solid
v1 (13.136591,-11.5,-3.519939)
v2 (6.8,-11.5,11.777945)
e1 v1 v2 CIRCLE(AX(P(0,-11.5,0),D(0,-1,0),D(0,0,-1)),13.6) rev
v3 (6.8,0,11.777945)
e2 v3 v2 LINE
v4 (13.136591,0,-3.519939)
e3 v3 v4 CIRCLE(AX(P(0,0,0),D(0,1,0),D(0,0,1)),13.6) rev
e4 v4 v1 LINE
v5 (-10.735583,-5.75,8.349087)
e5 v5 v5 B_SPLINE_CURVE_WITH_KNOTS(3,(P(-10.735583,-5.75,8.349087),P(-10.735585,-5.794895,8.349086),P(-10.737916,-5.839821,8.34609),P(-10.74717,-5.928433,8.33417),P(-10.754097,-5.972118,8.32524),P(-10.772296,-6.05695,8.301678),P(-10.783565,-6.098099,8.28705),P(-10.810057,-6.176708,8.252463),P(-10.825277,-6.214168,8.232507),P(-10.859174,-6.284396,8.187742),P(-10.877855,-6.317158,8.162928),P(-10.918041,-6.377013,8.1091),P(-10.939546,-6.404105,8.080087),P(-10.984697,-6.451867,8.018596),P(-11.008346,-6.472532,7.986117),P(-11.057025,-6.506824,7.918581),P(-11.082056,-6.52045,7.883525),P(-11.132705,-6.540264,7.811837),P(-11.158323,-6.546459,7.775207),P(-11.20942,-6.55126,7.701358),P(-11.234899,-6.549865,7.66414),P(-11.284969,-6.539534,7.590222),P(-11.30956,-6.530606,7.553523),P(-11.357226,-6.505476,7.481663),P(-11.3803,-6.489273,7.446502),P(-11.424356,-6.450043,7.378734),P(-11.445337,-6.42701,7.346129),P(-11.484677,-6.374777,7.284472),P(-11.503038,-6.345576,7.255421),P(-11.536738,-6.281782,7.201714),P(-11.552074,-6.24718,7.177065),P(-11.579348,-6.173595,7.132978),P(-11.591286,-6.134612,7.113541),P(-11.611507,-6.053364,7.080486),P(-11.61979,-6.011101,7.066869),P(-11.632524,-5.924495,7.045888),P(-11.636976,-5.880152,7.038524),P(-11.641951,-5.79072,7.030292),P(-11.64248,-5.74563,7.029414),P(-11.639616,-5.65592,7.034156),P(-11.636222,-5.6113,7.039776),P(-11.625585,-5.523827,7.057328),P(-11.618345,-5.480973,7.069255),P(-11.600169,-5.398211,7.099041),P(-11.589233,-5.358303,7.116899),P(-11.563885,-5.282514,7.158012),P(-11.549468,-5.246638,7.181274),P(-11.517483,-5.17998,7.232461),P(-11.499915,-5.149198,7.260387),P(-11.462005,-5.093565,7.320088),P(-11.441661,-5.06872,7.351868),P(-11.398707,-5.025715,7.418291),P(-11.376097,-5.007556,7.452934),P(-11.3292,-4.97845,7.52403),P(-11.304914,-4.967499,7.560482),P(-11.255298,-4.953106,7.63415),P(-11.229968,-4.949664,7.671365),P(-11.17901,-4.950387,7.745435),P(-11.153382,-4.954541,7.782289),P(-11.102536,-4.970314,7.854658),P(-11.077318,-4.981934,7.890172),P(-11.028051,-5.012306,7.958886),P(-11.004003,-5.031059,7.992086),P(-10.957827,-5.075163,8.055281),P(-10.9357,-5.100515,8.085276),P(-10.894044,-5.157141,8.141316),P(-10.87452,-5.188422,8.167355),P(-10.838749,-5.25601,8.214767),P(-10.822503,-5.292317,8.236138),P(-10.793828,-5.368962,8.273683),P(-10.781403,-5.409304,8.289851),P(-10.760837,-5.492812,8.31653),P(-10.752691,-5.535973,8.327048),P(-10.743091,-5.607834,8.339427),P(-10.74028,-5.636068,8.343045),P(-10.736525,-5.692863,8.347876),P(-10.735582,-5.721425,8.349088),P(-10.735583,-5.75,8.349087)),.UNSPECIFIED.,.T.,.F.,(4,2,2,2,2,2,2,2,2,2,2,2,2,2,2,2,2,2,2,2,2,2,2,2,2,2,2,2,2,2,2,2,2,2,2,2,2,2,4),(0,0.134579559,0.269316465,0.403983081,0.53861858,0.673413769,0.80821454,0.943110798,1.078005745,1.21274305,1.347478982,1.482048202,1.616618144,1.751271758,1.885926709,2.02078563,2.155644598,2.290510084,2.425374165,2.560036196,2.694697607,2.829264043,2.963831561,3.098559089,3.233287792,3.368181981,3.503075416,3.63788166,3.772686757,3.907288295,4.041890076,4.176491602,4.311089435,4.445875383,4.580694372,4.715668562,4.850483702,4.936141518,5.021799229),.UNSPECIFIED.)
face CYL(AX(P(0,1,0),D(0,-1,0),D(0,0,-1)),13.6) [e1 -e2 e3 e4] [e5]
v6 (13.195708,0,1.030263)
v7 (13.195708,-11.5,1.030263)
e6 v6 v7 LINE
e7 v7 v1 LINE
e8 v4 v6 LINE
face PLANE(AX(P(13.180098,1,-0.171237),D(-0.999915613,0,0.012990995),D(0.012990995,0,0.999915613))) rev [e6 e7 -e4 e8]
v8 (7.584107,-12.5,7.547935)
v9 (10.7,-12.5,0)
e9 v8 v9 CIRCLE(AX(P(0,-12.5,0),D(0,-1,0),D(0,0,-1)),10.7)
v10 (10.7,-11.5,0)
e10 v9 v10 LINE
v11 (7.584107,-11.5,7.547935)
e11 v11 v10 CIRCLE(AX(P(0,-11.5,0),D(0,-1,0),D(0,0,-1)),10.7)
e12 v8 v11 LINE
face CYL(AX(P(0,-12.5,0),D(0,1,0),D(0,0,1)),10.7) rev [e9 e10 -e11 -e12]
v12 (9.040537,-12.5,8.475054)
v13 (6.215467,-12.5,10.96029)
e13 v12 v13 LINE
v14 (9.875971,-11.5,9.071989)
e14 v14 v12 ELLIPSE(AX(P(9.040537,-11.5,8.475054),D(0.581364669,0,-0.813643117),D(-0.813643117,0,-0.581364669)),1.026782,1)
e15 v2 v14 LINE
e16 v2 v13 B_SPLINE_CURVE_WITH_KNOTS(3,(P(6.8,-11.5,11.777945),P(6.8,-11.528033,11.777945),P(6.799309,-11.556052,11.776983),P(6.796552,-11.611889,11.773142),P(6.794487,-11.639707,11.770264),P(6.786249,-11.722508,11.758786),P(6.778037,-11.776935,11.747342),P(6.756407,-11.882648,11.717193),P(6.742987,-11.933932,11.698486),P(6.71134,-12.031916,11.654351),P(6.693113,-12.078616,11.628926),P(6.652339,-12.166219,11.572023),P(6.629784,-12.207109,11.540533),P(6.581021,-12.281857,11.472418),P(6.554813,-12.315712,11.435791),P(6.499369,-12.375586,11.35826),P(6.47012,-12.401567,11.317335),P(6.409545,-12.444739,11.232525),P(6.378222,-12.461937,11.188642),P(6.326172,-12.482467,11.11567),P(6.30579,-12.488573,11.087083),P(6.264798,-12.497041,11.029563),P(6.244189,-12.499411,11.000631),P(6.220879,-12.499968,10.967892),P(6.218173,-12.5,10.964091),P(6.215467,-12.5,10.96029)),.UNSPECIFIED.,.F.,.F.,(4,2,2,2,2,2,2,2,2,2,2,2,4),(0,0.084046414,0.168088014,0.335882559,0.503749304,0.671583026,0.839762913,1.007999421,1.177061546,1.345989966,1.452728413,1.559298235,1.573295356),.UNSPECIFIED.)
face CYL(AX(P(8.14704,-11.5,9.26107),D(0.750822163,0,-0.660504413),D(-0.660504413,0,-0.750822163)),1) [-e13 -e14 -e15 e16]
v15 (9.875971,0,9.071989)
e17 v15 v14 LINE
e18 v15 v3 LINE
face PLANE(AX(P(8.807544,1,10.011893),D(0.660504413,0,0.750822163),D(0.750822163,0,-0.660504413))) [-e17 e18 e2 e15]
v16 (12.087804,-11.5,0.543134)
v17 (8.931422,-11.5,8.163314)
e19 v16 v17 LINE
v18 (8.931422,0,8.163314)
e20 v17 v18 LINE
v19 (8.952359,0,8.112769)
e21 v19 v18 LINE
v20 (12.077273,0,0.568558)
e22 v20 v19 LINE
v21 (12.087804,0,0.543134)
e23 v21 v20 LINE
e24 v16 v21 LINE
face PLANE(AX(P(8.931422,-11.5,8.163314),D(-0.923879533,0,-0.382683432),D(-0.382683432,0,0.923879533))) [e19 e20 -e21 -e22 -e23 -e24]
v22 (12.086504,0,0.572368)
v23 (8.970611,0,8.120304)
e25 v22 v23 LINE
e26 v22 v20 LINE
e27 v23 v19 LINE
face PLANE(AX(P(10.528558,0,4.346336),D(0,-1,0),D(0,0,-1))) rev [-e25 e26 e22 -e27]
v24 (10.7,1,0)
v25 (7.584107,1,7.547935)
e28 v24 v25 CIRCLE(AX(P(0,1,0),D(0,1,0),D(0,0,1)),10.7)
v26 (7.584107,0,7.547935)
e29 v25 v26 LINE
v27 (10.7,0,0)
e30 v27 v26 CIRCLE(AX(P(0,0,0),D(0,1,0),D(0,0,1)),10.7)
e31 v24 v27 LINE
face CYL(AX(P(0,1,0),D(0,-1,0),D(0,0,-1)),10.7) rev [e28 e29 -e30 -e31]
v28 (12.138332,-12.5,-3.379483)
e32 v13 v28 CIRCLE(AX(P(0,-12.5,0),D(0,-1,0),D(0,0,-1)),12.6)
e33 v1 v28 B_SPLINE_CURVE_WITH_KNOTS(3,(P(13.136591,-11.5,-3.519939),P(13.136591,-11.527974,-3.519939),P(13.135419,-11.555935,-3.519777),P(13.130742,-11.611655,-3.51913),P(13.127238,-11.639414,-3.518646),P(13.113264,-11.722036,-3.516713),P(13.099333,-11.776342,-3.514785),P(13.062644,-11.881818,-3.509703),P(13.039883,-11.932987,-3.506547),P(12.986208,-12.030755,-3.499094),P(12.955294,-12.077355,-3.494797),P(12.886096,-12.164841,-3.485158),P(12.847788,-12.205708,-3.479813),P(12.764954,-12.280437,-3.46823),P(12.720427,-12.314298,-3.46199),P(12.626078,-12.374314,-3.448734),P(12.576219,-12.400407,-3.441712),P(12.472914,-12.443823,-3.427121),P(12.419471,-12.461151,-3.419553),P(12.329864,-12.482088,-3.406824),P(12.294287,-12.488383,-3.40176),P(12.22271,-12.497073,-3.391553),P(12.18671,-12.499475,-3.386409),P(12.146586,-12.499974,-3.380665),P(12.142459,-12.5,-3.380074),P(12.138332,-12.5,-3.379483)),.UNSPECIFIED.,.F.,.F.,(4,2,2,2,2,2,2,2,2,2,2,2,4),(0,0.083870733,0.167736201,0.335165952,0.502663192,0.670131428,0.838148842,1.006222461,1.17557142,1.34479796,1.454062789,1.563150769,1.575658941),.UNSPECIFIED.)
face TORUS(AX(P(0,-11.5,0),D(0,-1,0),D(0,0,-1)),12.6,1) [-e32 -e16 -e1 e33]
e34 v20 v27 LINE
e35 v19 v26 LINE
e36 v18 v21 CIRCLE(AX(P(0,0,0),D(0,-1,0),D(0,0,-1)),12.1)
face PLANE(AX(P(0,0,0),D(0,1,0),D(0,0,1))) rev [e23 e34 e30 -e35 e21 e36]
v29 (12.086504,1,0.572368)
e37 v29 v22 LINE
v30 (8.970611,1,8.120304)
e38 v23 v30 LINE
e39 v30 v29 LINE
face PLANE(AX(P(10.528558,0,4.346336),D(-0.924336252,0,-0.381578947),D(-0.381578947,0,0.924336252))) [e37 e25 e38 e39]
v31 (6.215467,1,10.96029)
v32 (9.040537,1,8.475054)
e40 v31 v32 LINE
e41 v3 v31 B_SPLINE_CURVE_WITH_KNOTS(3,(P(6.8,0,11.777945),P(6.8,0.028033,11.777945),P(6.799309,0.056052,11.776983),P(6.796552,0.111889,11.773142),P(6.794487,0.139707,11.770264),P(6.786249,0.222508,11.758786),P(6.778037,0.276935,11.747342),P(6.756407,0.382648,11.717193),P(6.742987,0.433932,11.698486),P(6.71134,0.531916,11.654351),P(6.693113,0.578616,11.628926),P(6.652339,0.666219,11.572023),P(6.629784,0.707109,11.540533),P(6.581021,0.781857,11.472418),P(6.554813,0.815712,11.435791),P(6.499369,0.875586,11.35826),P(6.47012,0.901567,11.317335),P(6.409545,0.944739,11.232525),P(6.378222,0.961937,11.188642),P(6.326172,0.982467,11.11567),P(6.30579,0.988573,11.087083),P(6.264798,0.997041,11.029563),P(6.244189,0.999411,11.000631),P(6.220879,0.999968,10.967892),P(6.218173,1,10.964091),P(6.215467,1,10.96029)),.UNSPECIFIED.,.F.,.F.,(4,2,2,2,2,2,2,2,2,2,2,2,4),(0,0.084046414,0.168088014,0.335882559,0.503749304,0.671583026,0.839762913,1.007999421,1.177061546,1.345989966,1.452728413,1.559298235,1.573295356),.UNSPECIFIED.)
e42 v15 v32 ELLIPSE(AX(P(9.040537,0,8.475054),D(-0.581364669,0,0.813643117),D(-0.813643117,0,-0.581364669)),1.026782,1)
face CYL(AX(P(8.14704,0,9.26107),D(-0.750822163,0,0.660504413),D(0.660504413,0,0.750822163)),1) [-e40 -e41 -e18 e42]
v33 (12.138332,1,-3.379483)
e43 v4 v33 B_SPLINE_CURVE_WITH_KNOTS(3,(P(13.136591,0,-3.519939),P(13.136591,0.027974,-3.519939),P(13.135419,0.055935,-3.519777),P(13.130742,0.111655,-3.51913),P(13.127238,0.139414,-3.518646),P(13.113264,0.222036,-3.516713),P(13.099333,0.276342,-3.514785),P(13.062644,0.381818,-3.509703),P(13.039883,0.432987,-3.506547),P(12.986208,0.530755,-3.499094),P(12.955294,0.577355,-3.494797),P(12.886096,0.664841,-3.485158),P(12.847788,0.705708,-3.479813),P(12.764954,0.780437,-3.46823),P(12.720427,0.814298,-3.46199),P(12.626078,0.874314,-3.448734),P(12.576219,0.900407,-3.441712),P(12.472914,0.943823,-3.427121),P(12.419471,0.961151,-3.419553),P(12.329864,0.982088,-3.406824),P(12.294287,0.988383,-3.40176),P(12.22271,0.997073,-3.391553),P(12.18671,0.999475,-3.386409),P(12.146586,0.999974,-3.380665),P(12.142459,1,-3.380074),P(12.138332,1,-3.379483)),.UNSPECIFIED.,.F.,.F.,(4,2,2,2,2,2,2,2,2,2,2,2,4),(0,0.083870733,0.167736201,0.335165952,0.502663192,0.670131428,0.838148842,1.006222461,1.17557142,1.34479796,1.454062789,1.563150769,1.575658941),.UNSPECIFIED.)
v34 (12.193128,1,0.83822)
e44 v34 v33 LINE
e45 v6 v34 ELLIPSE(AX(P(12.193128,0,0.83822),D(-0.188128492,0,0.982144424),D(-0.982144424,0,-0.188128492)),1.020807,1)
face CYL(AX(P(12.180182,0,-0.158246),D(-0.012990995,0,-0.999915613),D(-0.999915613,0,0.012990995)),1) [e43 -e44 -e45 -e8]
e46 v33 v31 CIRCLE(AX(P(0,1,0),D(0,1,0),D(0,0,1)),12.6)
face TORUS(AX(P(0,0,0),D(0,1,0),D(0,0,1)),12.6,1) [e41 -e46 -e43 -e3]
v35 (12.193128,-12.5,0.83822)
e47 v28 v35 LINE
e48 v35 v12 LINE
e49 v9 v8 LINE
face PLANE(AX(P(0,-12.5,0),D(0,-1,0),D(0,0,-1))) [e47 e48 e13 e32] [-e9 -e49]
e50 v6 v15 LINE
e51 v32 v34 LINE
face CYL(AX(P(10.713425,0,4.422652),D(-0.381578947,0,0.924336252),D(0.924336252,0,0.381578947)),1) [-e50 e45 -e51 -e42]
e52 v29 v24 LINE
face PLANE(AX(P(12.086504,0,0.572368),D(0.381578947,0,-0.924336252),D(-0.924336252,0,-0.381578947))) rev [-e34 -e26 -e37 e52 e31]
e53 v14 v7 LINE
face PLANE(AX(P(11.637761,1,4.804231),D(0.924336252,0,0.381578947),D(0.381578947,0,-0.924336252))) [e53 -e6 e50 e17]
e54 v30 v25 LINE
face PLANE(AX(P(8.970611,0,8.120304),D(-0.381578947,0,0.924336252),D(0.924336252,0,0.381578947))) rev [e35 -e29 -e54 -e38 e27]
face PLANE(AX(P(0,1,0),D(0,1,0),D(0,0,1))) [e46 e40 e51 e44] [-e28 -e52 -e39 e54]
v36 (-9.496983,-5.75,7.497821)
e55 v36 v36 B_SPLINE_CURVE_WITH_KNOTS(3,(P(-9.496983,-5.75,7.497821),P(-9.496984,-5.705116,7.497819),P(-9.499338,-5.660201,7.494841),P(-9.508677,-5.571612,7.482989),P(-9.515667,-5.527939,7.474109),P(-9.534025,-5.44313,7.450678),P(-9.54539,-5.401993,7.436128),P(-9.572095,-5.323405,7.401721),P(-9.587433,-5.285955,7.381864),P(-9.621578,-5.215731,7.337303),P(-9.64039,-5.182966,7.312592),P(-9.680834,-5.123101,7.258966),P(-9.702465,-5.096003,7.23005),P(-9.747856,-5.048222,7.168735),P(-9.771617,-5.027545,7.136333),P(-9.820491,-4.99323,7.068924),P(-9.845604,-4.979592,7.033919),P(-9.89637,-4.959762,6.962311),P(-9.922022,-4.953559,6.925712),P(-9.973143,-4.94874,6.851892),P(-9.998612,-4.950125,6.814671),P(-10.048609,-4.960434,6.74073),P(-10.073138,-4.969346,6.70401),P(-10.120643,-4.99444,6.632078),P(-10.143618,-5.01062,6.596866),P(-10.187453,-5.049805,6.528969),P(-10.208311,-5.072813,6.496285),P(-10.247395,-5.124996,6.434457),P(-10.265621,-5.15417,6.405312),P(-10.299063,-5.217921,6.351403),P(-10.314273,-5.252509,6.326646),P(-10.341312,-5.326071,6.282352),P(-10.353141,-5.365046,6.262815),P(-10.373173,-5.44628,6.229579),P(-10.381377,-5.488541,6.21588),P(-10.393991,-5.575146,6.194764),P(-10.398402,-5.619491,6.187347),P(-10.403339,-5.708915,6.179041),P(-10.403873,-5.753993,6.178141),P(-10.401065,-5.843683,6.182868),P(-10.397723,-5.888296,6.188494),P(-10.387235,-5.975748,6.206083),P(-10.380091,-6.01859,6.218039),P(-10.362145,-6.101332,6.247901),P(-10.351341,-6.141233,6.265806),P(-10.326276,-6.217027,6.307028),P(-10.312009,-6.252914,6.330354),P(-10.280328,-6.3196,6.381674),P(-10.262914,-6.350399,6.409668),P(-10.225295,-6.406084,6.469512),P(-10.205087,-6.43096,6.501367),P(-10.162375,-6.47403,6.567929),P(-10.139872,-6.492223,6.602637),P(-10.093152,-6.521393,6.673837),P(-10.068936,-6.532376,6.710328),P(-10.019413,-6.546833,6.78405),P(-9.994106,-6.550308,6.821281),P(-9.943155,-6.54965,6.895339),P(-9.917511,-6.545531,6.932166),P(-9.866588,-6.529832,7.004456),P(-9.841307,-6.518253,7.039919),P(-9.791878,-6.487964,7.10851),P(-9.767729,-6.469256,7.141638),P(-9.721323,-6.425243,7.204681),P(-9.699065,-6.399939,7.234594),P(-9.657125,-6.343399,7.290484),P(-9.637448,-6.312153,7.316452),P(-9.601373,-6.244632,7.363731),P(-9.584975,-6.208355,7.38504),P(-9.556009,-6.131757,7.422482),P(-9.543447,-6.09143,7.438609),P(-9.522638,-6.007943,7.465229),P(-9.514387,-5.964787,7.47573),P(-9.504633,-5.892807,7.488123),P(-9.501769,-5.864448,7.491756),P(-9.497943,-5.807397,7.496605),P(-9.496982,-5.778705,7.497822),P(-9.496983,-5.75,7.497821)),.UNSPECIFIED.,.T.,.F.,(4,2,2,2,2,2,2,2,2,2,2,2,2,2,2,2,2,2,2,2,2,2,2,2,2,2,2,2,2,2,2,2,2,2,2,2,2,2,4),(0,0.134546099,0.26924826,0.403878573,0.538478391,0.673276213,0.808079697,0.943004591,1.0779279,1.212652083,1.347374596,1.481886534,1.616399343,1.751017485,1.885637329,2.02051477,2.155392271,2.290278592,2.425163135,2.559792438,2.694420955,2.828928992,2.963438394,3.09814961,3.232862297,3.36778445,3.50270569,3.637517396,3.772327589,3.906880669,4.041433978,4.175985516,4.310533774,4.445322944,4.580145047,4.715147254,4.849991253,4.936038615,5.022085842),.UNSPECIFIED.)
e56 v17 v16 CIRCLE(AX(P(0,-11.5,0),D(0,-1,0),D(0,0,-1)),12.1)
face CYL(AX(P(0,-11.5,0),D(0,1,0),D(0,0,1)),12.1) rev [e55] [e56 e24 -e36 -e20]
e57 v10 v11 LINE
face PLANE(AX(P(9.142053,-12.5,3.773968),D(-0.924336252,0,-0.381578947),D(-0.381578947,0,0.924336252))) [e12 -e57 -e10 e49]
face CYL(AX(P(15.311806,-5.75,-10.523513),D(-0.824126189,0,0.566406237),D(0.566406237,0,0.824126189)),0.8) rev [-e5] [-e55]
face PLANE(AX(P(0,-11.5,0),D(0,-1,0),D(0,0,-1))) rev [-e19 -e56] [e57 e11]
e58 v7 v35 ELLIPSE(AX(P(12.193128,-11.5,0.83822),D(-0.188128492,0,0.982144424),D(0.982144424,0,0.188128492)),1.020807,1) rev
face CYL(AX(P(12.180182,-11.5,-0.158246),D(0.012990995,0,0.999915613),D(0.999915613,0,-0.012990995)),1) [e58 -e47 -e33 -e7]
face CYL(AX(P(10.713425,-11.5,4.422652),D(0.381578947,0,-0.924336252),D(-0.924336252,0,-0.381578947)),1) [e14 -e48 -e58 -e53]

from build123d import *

# Parameters (mm, degrees)
EXTRUDE_1_DEPTH         = 1
EXTRUDE_START           = 11.5
EXTRUDE_3_DEPTH         = 11.5
EXTRUDE_START_2         = 1
EXTRUDE_4_DEPTH         = 1
FILLET_1_R              = 1
FILLET_2_R              = 1
SKETCH_7_W              = 8.165789474
SKETCH_7_H              = 1
CUT_EXTRUDE_1_DEPTH     = 1.5
CUT_EXTRUDE1_REACH      = 35.09
CUT_EXTRUDE1_END_RADIUS = 12.1
SKETCH5_R               = 0.8


with BuildPart() as part:
    # 草图1 → 凸台-拉伸1 (new body)
    with BuildSketch(Plane(origin=(0, 0, 0), x_dir=(1, 0, 0), z_dir=(0, 1, 0))):
        with BuildLine():
            Line((13.195707881, -1.030263158), (9.875971039, -9.071988551))
            Line((9.875971039, -9.071988551), (6.8, -11.777945491))
            ThreePointArc((6.8, -11.777945491), (-12.564761642, 5.20449468), (13.136591238, 3.519939013))
            Line((13.136591238, 3.519939013), (13.195707881, -1.030263158))
        make_face()
        with BuildLine():
            Line((10.7, 0), (7.584106648, -7.547935237))
            ThreePointArc((7.584106648, -7.547935237), (-9.890397897, 4.082894737), (10.7, 0))
        make_face(mode=Mode.SUBTRACT)
    extrude(amount=EXTRUDE_1_DEPTH)

    # 草图2 → 凸台-拉伸3 (add)
    with BuildSketch(Plane(origin=(0, 0, 0), x_dir=(-1, 0, 0), z_dir=(0, -1, 0)).offset(EXTRUDE_START)):
        with BuildLine():
            Line((-13.195707881, -1.030263158), (-13.136591238, 3.519939013))
            ThreePointArc((-13.136591238, 3.519939013), (12.564761642, 5.20449468), (-6.8, -11.777945491))
            Line((-6.8, -11.777945491), (-9.875971039, -9.071988551))
            Line((-9.875971039, -9.071988551), (-13.195707881, -1.030263158))
        make_face()
        with BuildLine():
            Line((-8.931421918, -8.163314433), (-12.087803996, -0.543134011))
            ThreePointArc((-12.087803996, -0.543134011), (11.178942343, 4.630469532), (-8.931421918, -8.163314433))
        make_face(mode=Mode.SUBTRACT)
    extrude(amount=-EXTRUDE_3_DEPTH)

    # 草图5 → 凸台-拉伸4 (add)
    with BuildSketch(Plane(origin=(0, -11.5, 0), x_dir=(-1, 0, 0), z_dir=(0, -1, 0)).offset(EXTRUDE_START_2)):
        with BuildLine():
            Line((-13.136591238, 3.519939013), (-13.195707881, -1.030263158))
            Line((-13.195707881, -1.030263158), (-9.875971039, -9.071988551))
            Line((-9.875971039, -9.071988551), (-6.8, -11.777945491))
            ThreePointArc((-6.8, -11.777945491), (12.564761642, 5.20449468), (-13.136591238, 3.519939013))
        make_face()
        with BuildLine():
            Line((-10.7, 0), (-7.584106648, -7.547935237))
            ThreePointArc((-7.584106648, -7.547935237), (9.890397897, 4.082894737), (-10.7, 0))
        make_face(mode=Mode.SUBTRACT)
    extrude(amount=-EXTRUDE_4_DEPTH)

    # 圆角1
    # the kernel refuses this fillet: 1 mm, written as the material it takes off along each edge
    with BuildSketch(Plane(origin=(11.753026447, -12.5, 7.42072752), x_dir=(-0.6605044125759215, 0, -0.750822163343449), z_dir=(-0.7508221633434491, 0, 0.6605044125759215))) as fillet_1_piece_1:
        with BuildLine():
            CenterArc((FILLET_1_R, -FILLET_1_R), FILLET_1_R, 90, 90)
            Line((0, -FILLET_1_R), (0, 0))
            Line((0, 0), (FILLET_1_R, 0))
        make_face()
    extrude(amount=9.096803729, mode=Mode.SUBTRACT)
    with BuildSketch(Plane(origin=(0, -12.5, 0), x_dir=(0.6504408329525787, 0, 0.7595569253373676), z_dir=(0.7595569253373676, 0, -0.6504408329525787))) as fillet_1_piece_2:
        with BuildLine():
            CenterArc((13.6 - FILLET_1_R, -FILLET_1_R), FILLET_1_R, 0, 90)
            Line((13.6 - FILLET_1_R, 0), (13.6, 0))
            Line((13.6, 0), (13.6, -FILLET_1_R))
        make_face()
    revolve(axis=Axis((0, -12.5, 0), (0, -1, 0)), revolution_arc=306.149694078, mode=Mode.SUBTRACT)
    with BuildSketch(Plane(origin=(13.10411375, -12.5, -6.019728047), x_dir=(0, 1, 0), z_dir=(0.012990995176433182, 0, 0.9999156134616191))) as fillet_1_piece_3:
        with BuildLine():
            CenterArc((FILLET_1_R, FILLET_1_R), FILLET_1_R, 180, 90)
            Line((0, FILLET_1_R), (0, 0))
            Line((0, 0), (FILLET_1_R, 0))
        make_face()
    extrude(amount=9.55058618, mode=Mode.SUBTRACT)
    with BuildSketch(Plane(origin=(14.149655249, -12.5, -1.280577472), x_dir=(0, 1, 0), z_dir=(-0.381578947368421, 0, 0.9243362520886044))) as fillet_1_piece_4:
        with BuildLine():
            CenterArc((FILLET_1_R, FILLET_1_R), FILLET_1_R, 180, 90)
            Line((0, FILLET_1_R), (0, 0))
            Line((0, 0), (FILLET_1_R, 0))
        make_face()
    extrude(amount=13.7, mode=Mode.SUBTRACT)

    # 圆角2
    # the kernel refuses this fillet: 1 mm, written as the material it takes off along each edge
    with BuildSketch(Plane(origin=(13.10411375, 1, -6.019728047), x_dir=(0, -1, 0), z_dir=(0.012990995176439143, 0, 0.999915613461619))) as fillet_2_piece_1:
        with BuildLine():
            CenterArc((FILLET_2_R, -FILLET_2_R), FILLET_2_R, 90, 90)
            Line((0, -FILLET_2_R), (0, 0))
            Line((0, 0), (FILLET_2_R, 0))
        make_face()
    extrude(amount=9.55058618, mode=Mode.SUBTRACT)
    with BuildSketch(Plane(origin=(0, 1, 0), x_dir=(0.6504408329525777, 0, 0.7595569253373686), z_dir=(0.7595569253373686, 0, -0.6504408329525777))) as fillet_2_piece_2:
        with BuildLine():
            CenterArc((13.6 - FILLET_2_R, FILLET_2_R), FILLET_2_R, 270, 90)
            Line((13.6 - FILLET_2_R, 0), (13.6, 0))
            Line((13.6, 0), (13.6, FILLET_2_R))
        make_face()
    revolve(axis=Axis((0, 1, 0), (0, -1, 0)), revolution_arc=306.149694078, mode=Mode.SUBTRACT)
    with BuildSketch(Plane(origin=(11.753026447, 1, 7.42072752), x_dir=(-0.6605044125759212, 0, -0.7508221633434494), z_dir=(-0.7508221633434494, 0, 0.6605044125759212))) as fillet_2_piece_3:
        with BuildLine():
            CenterArc((FILLET_2_R, FILLET_2_R), FILLET_2_R, 180, 90)
            Line((0, FILLET_2_R), (0, 0))
            Line((0, 0), (FILLET_2_R, 0))
        make_face()
    extrude(amount=9.096803729, mode=Mode.SUBTRACT)
    with BuildSketch(Plane(origin=(14.149655249, 1, -1.280577472), x_dir=(-0.9243362520886043, 0, -0.38157894736842096), z_dir=(-0.381578947368421, 0, 0.9243362520886044))) as fillet_2_piece_4:
        with BuildLine():
            CenterArc((FILLET_2_R, FILLET_2_R), FILLET_2_R, 180, 90)
            Line((0, FILLET_2_R), (0, 0))
            Line((0, 0), (FILLET_2_R, 0))
        make_face()
    extrude(amount=13.7, mode=Mode.SUBTRACT)

    # 草图7 → 切除-拉伸1 (cut)
    with BuildSketch(Plane(origin=(9.142053324, 0, 3.773967619), x_dir=(-0.3815789473684208, 0, 0.9243362520886044), z_dir=(-0.9243362520886044, 0, -0.3815789473684208))):
        with Locations((0, 0.5)):
            Rectangle(SKETCH_7_W, SKETCH_7_H)
    extrude(amount=-CUT_EXTRUDE_1_DEPTH, mode=Mode.SUBTRACT)

    # Cut-Extrude1: up to this cylinder (the profile starts outside it)
    cut_extrude1_end = Plane(origin=(0, -5.75, 0), z_dir=(0, 1, 0)) * Cylinder(CUT_EXTRUDE1_END_RADIUS, 95.38, mode=Mode.PRIVATE)
    # Sketch5 → Cut-Extrude1 (cut, up to the surface)
    with BuildSketch(Plane(origin=(-11.208116165, -5.75, 7.703124822), x_dir=(0.5664062369248345, 0, 0.8241261886220146), z_dir=(-0.8241261886220146, 0, 0.5664062369248345)), mode=Mode.PRIVATE) as cut_extrude1_sk1:
        Circle(SKETCH5_R)
    cut_extrude1_tool1 = extrude(cut_extrude1_sk1.sketch, amount=-CUT_EXTRUDE1_REACH, mode=Mode.PRIVATE) - cut_extrude1_end
    add(cut_extrude1_tool1.solids().sort_by_distance((-11.208116, -5.75, 7.703125))[0], mode=Mode.SUBTRACT)


solid = part.part
